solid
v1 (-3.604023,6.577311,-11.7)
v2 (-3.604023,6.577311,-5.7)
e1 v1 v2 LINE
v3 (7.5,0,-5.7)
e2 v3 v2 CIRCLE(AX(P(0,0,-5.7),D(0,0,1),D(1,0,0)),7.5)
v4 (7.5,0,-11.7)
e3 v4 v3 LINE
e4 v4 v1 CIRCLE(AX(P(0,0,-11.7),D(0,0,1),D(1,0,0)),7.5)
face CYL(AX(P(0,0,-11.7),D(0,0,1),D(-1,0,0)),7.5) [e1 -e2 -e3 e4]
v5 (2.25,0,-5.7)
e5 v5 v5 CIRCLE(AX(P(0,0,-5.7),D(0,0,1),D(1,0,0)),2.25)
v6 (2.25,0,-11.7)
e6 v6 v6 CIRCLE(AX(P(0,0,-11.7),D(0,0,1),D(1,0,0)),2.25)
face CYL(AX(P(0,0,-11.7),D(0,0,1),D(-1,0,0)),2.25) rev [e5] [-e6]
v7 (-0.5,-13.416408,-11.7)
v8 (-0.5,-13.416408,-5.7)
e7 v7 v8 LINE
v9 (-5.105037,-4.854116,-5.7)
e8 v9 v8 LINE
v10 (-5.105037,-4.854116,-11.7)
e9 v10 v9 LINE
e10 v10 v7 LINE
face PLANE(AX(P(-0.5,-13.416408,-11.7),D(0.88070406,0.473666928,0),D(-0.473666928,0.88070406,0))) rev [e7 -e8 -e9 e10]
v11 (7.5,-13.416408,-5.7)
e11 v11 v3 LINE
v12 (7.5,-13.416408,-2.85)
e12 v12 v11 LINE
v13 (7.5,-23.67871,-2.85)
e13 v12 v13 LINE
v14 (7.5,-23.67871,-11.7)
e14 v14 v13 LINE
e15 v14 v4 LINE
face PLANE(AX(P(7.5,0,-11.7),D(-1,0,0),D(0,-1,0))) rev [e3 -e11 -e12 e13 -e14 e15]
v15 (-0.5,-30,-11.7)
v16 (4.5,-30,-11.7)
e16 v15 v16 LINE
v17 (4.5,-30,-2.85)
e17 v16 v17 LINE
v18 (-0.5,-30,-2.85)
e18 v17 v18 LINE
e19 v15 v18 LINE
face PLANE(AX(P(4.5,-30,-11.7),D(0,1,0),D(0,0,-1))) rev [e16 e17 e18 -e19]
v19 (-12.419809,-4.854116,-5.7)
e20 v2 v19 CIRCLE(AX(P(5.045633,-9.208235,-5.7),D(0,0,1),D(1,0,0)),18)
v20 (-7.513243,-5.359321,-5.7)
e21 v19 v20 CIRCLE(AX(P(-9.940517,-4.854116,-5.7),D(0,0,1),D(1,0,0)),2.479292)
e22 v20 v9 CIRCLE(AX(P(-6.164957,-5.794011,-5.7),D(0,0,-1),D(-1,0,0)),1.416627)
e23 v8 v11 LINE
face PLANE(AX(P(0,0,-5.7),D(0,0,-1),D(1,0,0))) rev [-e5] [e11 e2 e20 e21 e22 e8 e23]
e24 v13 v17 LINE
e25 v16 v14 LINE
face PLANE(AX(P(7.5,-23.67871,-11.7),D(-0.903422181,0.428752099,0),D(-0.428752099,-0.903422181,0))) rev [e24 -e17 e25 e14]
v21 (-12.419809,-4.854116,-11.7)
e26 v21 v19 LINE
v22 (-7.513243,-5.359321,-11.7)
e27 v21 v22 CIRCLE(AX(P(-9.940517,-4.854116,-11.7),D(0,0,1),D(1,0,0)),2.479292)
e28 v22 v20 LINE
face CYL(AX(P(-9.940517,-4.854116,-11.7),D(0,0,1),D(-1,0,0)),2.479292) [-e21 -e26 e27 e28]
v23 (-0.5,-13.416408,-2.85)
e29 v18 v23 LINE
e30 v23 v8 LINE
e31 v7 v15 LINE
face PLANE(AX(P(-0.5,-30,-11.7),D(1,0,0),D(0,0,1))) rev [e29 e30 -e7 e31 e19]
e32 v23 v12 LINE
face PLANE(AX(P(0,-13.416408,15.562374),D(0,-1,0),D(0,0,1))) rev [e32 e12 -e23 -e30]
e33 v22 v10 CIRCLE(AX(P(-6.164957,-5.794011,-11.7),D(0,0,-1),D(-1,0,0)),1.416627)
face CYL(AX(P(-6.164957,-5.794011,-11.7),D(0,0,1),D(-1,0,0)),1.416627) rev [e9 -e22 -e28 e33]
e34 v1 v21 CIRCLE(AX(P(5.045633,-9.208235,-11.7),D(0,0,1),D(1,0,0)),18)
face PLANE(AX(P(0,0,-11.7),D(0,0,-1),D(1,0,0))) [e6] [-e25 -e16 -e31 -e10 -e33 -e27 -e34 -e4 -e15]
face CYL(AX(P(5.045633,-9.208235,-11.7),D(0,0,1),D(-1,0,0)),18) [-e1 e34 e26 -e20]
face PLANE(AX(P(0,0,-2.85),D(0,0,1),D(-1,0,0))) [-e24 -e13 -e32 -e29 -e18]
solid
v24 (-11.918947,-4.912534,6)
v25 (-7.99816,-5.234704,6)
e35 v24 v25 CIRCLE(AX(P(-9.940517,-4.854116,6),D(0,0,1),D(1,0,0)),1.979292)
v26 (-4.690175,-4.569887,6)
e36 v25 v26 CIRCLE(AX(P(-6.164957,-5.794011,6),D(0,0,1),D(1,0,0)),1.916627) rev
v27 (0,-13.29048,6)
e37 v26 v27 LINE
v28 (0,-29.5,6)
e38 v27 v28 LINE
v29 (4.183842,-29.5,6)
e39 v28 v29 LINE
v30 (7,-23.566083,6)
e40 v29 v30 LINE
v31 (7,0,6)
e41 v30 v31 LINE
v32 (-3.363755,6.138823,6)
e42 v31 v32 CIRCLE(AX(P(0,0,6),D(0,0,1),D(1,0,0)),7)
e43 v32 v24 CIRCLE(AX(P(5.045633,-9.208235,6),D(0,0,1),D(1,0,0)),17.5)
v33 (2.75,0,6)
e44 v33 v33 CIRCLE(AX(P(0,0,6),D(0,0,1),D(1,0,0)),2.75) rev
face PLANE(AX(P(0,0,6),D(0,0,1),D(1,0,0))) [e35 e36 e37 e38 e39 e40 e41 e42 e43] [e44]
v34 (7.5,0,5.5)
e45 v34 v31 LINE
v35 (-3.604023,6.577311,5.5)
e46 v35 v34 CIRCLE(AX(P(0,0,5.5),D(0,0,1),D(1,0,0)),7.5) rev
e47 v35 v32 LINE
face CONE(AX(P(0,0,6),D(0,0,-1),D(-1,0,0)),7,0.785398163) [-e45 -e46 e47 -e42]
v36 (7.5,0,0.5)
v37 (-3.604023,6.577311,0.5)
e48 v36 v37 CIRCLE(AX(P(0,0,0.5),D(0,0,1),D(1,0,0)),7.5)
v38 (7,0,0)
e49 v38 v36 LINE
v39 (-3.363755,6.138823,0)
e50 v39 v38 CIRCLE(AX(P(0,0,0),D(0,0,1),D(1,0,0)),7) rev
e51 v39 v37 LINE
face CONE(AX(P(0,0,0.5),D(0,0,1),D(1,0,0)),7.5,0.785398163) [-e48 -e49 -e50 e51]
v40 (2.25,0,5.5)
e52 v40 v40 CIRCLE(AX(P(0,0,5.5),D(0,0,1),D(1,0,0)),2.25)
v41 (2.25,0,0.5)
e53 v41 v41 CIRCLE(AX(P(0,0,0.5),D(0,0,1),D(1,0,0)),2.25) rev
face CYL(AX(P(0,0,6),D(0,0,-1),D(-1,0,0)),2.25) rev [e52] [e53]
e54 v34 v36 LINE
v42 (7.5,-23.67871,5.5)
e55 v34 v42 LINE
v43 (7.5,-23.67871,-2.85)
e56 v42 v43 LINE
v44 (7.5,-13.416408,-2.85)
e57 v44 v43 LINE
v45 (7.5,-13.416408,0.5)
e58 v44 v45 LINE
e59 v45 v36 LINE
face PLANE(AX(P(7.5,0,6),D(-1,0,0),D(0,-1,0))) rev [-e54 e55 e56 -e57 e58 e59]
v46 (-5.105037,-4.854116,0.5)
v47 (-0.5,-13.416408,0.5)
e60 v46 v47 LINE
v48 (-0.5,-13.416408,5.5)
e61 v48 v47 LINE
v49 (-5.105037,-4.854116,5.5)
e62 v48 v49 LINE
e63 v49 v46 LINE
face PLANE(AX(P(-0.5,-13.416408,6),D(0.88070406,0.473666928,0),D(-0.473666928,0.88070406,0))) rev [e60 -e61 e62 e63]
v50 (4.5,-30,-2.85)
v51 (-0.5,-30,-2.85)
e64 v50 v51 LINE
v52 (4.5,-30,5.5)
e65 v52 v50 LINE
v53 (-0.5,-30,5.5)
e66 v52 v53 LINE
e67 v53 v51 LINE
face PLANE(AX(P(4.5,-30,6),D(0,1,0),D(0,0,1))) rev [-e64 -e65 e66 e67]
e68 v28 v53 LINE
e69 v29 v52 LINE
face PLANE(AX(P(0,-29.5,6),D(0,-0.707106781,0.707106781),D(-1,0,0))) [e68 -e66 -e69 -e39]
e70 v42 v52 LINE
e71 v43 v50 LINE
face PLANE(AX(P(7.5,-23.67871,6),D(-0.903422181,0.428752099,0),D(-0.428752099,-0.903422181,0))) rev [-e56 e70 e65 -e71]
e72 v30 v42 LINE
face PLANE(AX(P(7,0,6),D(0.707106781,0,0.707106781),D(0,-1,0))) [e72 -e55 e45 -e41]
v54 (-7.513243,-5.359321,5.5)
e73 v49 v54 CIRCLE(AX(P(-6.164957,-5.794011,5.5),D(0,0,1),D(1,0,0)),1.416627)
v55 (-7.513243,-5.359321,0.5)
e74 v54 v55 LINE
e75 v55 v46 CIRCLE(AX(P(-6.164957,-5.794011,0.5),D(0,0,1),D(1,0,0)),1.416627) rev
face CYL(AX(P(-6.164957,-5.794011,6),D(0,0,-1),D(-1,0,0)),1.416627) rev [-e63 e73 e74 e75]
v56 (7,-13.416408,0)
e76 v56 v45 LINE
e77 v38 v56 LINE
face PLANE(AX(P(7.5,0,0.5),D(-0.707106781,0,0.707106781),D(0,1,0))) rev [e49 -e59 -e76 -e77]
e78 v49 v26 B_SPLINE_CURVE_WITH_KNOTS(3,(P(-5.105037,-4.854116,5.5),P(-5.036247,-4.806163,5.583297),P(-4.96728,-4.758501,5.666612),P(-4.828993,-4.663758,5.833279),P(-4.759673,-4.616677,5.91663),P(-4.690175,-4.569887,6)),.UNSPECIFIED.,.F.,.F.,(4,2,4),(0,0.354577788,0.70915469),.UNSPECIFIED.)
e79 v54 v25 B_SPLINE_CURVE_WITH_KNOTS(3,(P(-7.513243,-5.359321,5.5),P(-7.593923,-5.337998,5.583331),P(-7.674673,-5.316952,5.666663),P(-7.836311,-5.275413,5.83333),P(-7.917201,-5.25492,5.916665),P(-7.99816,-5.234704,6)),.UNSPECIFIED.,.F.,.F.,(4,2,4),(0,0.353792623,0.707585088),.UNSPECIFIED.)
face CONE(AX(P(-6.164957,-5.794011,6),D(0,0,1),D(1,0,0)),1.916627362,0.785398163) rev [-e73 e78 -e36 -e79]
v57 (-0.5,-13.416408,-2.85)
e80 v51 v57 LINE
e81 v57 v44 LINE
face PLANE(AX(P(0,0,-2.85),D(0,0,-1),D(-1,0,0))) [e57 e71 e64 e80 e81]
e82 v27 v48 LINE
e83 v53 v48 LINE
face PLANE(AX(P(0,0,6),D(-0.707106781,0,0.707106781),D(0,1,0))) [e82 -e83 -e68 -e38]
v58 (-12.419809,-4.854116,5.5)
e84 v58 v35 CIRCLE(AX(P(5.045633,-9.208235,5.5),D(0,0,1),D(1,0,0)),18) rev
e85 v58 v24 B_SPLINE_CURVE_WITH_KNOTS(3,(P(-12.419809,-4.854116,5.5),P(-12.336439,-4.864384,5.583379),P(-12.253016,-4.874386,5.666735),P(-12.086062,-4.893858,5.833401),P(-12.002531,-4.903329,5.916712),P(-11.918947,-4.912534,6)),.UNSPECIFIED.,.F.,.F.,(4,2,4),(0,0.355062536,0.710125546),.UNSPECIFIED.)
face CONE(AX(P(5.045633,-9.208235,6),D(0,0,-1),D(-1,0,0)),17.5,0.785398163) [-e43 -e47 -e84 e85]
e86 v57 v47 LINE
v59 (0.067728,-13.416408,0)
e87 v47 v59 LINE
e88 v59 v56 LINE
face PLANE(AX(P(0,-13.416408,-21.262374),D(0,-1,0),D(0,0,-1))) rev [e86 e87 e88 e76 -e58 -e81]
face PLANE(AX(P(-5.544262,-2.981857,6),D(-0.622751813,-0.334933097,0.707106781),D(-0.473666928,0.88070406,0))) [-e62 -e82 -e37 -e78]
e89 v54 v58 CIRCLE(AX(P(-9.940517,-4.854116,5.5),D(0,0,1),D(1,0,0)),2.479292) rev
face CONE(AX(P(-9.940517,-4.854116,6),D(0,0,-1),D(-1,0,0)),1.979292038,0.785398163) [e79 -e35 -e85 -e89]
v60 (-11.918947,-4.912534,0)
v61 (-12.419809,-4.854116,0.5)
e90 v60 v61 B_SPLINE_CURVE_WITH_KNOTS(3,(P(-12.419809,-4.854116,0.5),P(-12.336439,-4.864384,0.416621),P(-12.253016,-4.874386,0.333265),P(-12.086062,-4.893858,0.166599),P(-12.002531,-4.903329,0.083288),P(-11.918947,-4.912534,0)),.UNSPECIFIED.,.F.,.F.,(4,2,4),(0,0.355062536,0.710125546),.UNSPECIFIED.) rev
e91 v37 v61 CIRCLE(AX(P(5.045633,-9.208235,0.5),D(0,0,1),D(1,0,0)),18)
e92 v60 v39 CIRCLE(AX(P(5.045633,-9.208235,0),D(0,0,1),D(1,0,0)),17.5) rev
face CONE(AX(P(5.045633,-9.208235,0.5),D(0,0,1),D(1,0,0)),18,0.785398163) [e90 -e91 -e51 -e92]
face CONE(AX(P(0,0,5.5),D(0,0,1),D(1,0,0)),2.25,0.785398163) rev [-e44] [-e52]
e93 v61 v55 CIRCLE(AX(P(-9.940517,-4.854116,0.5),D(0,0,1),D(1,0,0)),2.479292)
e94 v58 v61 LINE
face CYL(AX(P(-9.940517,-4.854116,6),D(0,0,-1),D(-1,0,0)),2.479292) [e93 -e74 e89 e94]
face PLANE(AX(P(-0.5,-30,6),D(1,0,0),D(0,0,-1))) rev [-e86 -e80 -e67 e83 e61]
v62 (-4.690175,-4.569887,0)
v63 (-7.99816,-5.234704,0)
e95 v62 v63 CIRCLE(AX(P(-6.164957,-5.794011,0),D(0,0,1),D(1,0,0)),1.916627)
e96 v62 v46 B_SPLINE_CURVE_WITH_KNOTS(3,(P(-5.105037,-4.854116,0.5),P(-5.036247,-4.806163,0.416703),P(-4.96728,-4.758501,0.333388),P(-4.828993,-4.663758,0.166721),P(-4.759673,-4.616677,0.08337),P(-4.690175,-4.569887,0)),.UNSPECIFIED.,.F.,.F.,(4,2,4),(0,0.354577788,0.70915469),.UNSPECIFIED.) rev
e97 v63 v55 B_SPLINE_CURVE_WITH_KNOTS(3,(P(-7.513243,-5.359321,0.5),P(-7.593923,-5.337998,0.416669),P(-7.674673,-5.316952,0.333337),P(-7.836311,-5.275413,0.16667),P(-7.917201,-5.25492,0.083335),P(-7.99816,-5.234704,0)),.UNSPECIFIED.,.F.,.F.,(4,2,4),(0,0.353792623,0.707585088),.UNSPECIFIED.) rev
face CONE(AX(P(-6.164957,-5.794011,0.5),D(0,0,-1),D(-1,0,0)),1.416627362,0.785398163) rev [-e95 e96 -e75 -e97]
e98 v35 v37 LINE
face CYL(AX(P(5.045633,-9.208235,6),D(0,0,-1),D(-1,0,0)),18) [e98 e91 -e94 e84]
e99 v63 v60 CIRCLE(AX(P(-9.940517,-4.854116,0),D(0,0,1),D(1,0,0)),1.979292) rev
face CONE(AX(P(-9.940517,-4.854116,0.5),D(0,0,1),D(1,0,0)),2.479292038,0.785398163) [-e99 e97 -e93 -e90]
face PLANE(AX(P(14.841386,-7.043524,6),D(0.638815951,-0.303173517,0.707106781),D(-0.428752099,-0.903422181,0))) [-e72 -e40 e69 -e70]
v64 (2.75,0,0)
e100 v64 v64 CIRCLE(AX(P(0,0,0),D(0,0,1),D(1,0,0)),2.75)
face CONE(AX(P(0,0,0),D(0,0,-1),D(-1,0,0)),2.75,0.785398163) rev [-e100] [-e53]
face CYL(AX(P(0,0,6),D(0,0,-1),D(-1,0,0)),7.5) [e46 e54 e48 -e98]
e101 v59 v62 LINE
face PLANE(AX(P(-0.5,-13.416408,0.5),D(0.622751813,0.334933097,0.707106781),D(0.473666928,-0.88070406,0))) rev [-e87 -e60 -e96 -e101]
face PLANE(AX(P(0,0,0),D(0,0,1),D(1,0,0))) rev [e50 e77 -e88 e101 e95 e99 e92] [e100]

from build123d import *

# Parameters (mm, degrees)
SKETCH1_R           = 2.25
BOSS_EXTRUDE1_DEPTH = 6
BOSS_EXTRUDE2_DEPTH = 2.85
CHAMFER1_SIZE       = 0.5
CHAMFER4_SIZE       = 0.5


with BuildPart() as part:
    # Sketch1 → Boss-Extrude1 (new body)
    with BuildSketch(Plane.XY):
        with BuildLine():
            Line((7.5, 0), (7.5, -23.678709565))
            Line((7.5, -23.678709565), (4.5, -30))
            Line((4.5, -30), (-0.5, -30))
            Line((-0.5, -30), (-0.5, -13.416407865))
            Line((-0.5, -13.416407865), (-5.105036517, -4.854116258))
            ThreePointArc((-5.105036517, -4.854116258), (-6.45581184, -4.407563939), (-7.51324337, -5.359321001))
            ThreePointArc((-7.51324337, -5.359321001), (-10.19445484, -7.320369402), (-12.419809017, -4.854116258))
            ThreePointArc((-12.419809017, -4.854116258), (-9.208102345, 1.784082351), (-3.604023267, 6.577310719))
            ThreePointArc((-3.604023267, 6.577310719), (3.822291557, 6.452913082), (7.5, 0))
        make_face()
        Circle(SKETCH1_R, mode=Mode.SUBTRACT)
    extrude(amount=BOSS_EXTRUDE1_DEPTH)

    # Sketch2 → Boss-Extrude2 (add)
    with BuildSketch(Plane(origin=(0, 0, 0), x_dir=(-1, 0, 0), z_dir=(0, 0, -1))):
        Polygon((0.5, -30), (0.5, -13.416407865), (-7.5, -13.416407865), (-7.5, -23.678709565), (-4.5, -30), align=None)
    extrude(amount=BOSS_EXTRUDE2_DEPTH)


with BuildPart() as body_2:
    # Mirror2: mirrored copy
    add(part.part.mirror(Plane(origin=(0, 0, -2.85), x_dir=(1, 0, 0), z_dir=(0, 0, -1))))


with BuildPart() as part_1:
    add(part.part)

    # Chamfer1
    chamfer1_edges = [part_1.edges().sort_by_distance(p)[0] for p in [
        (7.5, -11.839354782, 6),
        (-9.208102345, 1.784082351, 6),
        (3.822291557, 6.452913082, 6),
    ]]
    chamfer(chamfer1_edges, length=CHAMFER1_SIZE)
    chamfer1_2_edges = [part_1.edges().sort_by_distance(p)[0] for p in [
        (-2.25, 0, 6),
    ]]
    chamfer(chamfer1_2_edges, length=CHAMFER1_SIZE)
    chamfer1_3_edges = [part_1.edges().sort_by_distance(p)[0] for p in [
        (-0.5, -21.708203932, 6),
    ]]
    chamfer(chamfer1_3_edges, length=CHAMFER1_SIZE)
    chamfer1_4_edges = [part_1.edges().sort_by_distance(p)[0] for p in [
        (2.25, -30, 6),
    ]]
    chamfer(chamfer1_4_edges, length=CHAMFER1_SIZE)
    chamfer1_5_edges = [part_1.edges().sort_by_distance(p)[0] for p in [
        (-6.45581184, -4.407563939, 6),
    ]]
    chamfer(chamfer1_5_edges, length=CHAMFER1_SIZE)
    chamfer1_6_edges = [part_1.edges().sort_by_distance(p)[0] for p in [
        (-9.615213291, -7.311974374, 6),
    ]]
    chamfer(chamfer1_6_edges, length=CHAMFER1_SIZE)
    chamfer1_7_edges = [part_1.edges().sort_by_distance(p)[0] for p in [
        (5.86864666, -27.116128985, 6),
    ]]
    chamfer(chamfer1_7_edges, length=CHAMFER1_SIZE)
    chamfer1_8_edges = [part_1.edges().sort_by_distance(p)[0] for p in [
        (-2.802518259, -9.135262062, 6),
    ]]
    chamfer(chamfer1_8_edges, length=CHAMFER1_SIZE)

    # Chamfer4
    chamfer4_edges = [part_1.edges().sort_by_distance(p)[0] for p in [
        (-2.25, 0, 0),
    ]]
    chamfer(chamfer4_edges, length=CHAMFER4_SIZE)
    chamfer4_2_edges = [part_1.edges().sort_by_distance(p)[0] for p in [
        (3.822291557, 6.452913082, 0),
        (-9.208102345, 1.784082351, 0),
        (7.5, -6.708203932, 0),
    ]]
    chamfer(chamfer4_2_edges, length=CHAMFER4_SIZE)
    chamfer4_3_edges = [part_1.edges().sort_by_distance(p)[0] for p in [
        (-6.45581184, -4.407563939, 0),
    ]]
    chamfer(chamfer4_3_edges, length=CHAMFER4_SIZE)
    chamfer4_4_edges = [part_1.edges().sort_by_distance(p)[0] for p in [
        (-2.802518259, -9.135262062, 0),
    ]]
    chamfer(chamfer4_4_edges, length=CHAMFER4_SIZE)
    chamfer4_5_edges = [part_1.edges().sort_by_distance(p)[0] for p in [
        (-9.615213291, -7.311974374, 0),
    ]]
    chamfer(chamfer4_5_edges, length=CHAMFER4_SIZE)


solid = Compound([body_2.part, part_1.part])
